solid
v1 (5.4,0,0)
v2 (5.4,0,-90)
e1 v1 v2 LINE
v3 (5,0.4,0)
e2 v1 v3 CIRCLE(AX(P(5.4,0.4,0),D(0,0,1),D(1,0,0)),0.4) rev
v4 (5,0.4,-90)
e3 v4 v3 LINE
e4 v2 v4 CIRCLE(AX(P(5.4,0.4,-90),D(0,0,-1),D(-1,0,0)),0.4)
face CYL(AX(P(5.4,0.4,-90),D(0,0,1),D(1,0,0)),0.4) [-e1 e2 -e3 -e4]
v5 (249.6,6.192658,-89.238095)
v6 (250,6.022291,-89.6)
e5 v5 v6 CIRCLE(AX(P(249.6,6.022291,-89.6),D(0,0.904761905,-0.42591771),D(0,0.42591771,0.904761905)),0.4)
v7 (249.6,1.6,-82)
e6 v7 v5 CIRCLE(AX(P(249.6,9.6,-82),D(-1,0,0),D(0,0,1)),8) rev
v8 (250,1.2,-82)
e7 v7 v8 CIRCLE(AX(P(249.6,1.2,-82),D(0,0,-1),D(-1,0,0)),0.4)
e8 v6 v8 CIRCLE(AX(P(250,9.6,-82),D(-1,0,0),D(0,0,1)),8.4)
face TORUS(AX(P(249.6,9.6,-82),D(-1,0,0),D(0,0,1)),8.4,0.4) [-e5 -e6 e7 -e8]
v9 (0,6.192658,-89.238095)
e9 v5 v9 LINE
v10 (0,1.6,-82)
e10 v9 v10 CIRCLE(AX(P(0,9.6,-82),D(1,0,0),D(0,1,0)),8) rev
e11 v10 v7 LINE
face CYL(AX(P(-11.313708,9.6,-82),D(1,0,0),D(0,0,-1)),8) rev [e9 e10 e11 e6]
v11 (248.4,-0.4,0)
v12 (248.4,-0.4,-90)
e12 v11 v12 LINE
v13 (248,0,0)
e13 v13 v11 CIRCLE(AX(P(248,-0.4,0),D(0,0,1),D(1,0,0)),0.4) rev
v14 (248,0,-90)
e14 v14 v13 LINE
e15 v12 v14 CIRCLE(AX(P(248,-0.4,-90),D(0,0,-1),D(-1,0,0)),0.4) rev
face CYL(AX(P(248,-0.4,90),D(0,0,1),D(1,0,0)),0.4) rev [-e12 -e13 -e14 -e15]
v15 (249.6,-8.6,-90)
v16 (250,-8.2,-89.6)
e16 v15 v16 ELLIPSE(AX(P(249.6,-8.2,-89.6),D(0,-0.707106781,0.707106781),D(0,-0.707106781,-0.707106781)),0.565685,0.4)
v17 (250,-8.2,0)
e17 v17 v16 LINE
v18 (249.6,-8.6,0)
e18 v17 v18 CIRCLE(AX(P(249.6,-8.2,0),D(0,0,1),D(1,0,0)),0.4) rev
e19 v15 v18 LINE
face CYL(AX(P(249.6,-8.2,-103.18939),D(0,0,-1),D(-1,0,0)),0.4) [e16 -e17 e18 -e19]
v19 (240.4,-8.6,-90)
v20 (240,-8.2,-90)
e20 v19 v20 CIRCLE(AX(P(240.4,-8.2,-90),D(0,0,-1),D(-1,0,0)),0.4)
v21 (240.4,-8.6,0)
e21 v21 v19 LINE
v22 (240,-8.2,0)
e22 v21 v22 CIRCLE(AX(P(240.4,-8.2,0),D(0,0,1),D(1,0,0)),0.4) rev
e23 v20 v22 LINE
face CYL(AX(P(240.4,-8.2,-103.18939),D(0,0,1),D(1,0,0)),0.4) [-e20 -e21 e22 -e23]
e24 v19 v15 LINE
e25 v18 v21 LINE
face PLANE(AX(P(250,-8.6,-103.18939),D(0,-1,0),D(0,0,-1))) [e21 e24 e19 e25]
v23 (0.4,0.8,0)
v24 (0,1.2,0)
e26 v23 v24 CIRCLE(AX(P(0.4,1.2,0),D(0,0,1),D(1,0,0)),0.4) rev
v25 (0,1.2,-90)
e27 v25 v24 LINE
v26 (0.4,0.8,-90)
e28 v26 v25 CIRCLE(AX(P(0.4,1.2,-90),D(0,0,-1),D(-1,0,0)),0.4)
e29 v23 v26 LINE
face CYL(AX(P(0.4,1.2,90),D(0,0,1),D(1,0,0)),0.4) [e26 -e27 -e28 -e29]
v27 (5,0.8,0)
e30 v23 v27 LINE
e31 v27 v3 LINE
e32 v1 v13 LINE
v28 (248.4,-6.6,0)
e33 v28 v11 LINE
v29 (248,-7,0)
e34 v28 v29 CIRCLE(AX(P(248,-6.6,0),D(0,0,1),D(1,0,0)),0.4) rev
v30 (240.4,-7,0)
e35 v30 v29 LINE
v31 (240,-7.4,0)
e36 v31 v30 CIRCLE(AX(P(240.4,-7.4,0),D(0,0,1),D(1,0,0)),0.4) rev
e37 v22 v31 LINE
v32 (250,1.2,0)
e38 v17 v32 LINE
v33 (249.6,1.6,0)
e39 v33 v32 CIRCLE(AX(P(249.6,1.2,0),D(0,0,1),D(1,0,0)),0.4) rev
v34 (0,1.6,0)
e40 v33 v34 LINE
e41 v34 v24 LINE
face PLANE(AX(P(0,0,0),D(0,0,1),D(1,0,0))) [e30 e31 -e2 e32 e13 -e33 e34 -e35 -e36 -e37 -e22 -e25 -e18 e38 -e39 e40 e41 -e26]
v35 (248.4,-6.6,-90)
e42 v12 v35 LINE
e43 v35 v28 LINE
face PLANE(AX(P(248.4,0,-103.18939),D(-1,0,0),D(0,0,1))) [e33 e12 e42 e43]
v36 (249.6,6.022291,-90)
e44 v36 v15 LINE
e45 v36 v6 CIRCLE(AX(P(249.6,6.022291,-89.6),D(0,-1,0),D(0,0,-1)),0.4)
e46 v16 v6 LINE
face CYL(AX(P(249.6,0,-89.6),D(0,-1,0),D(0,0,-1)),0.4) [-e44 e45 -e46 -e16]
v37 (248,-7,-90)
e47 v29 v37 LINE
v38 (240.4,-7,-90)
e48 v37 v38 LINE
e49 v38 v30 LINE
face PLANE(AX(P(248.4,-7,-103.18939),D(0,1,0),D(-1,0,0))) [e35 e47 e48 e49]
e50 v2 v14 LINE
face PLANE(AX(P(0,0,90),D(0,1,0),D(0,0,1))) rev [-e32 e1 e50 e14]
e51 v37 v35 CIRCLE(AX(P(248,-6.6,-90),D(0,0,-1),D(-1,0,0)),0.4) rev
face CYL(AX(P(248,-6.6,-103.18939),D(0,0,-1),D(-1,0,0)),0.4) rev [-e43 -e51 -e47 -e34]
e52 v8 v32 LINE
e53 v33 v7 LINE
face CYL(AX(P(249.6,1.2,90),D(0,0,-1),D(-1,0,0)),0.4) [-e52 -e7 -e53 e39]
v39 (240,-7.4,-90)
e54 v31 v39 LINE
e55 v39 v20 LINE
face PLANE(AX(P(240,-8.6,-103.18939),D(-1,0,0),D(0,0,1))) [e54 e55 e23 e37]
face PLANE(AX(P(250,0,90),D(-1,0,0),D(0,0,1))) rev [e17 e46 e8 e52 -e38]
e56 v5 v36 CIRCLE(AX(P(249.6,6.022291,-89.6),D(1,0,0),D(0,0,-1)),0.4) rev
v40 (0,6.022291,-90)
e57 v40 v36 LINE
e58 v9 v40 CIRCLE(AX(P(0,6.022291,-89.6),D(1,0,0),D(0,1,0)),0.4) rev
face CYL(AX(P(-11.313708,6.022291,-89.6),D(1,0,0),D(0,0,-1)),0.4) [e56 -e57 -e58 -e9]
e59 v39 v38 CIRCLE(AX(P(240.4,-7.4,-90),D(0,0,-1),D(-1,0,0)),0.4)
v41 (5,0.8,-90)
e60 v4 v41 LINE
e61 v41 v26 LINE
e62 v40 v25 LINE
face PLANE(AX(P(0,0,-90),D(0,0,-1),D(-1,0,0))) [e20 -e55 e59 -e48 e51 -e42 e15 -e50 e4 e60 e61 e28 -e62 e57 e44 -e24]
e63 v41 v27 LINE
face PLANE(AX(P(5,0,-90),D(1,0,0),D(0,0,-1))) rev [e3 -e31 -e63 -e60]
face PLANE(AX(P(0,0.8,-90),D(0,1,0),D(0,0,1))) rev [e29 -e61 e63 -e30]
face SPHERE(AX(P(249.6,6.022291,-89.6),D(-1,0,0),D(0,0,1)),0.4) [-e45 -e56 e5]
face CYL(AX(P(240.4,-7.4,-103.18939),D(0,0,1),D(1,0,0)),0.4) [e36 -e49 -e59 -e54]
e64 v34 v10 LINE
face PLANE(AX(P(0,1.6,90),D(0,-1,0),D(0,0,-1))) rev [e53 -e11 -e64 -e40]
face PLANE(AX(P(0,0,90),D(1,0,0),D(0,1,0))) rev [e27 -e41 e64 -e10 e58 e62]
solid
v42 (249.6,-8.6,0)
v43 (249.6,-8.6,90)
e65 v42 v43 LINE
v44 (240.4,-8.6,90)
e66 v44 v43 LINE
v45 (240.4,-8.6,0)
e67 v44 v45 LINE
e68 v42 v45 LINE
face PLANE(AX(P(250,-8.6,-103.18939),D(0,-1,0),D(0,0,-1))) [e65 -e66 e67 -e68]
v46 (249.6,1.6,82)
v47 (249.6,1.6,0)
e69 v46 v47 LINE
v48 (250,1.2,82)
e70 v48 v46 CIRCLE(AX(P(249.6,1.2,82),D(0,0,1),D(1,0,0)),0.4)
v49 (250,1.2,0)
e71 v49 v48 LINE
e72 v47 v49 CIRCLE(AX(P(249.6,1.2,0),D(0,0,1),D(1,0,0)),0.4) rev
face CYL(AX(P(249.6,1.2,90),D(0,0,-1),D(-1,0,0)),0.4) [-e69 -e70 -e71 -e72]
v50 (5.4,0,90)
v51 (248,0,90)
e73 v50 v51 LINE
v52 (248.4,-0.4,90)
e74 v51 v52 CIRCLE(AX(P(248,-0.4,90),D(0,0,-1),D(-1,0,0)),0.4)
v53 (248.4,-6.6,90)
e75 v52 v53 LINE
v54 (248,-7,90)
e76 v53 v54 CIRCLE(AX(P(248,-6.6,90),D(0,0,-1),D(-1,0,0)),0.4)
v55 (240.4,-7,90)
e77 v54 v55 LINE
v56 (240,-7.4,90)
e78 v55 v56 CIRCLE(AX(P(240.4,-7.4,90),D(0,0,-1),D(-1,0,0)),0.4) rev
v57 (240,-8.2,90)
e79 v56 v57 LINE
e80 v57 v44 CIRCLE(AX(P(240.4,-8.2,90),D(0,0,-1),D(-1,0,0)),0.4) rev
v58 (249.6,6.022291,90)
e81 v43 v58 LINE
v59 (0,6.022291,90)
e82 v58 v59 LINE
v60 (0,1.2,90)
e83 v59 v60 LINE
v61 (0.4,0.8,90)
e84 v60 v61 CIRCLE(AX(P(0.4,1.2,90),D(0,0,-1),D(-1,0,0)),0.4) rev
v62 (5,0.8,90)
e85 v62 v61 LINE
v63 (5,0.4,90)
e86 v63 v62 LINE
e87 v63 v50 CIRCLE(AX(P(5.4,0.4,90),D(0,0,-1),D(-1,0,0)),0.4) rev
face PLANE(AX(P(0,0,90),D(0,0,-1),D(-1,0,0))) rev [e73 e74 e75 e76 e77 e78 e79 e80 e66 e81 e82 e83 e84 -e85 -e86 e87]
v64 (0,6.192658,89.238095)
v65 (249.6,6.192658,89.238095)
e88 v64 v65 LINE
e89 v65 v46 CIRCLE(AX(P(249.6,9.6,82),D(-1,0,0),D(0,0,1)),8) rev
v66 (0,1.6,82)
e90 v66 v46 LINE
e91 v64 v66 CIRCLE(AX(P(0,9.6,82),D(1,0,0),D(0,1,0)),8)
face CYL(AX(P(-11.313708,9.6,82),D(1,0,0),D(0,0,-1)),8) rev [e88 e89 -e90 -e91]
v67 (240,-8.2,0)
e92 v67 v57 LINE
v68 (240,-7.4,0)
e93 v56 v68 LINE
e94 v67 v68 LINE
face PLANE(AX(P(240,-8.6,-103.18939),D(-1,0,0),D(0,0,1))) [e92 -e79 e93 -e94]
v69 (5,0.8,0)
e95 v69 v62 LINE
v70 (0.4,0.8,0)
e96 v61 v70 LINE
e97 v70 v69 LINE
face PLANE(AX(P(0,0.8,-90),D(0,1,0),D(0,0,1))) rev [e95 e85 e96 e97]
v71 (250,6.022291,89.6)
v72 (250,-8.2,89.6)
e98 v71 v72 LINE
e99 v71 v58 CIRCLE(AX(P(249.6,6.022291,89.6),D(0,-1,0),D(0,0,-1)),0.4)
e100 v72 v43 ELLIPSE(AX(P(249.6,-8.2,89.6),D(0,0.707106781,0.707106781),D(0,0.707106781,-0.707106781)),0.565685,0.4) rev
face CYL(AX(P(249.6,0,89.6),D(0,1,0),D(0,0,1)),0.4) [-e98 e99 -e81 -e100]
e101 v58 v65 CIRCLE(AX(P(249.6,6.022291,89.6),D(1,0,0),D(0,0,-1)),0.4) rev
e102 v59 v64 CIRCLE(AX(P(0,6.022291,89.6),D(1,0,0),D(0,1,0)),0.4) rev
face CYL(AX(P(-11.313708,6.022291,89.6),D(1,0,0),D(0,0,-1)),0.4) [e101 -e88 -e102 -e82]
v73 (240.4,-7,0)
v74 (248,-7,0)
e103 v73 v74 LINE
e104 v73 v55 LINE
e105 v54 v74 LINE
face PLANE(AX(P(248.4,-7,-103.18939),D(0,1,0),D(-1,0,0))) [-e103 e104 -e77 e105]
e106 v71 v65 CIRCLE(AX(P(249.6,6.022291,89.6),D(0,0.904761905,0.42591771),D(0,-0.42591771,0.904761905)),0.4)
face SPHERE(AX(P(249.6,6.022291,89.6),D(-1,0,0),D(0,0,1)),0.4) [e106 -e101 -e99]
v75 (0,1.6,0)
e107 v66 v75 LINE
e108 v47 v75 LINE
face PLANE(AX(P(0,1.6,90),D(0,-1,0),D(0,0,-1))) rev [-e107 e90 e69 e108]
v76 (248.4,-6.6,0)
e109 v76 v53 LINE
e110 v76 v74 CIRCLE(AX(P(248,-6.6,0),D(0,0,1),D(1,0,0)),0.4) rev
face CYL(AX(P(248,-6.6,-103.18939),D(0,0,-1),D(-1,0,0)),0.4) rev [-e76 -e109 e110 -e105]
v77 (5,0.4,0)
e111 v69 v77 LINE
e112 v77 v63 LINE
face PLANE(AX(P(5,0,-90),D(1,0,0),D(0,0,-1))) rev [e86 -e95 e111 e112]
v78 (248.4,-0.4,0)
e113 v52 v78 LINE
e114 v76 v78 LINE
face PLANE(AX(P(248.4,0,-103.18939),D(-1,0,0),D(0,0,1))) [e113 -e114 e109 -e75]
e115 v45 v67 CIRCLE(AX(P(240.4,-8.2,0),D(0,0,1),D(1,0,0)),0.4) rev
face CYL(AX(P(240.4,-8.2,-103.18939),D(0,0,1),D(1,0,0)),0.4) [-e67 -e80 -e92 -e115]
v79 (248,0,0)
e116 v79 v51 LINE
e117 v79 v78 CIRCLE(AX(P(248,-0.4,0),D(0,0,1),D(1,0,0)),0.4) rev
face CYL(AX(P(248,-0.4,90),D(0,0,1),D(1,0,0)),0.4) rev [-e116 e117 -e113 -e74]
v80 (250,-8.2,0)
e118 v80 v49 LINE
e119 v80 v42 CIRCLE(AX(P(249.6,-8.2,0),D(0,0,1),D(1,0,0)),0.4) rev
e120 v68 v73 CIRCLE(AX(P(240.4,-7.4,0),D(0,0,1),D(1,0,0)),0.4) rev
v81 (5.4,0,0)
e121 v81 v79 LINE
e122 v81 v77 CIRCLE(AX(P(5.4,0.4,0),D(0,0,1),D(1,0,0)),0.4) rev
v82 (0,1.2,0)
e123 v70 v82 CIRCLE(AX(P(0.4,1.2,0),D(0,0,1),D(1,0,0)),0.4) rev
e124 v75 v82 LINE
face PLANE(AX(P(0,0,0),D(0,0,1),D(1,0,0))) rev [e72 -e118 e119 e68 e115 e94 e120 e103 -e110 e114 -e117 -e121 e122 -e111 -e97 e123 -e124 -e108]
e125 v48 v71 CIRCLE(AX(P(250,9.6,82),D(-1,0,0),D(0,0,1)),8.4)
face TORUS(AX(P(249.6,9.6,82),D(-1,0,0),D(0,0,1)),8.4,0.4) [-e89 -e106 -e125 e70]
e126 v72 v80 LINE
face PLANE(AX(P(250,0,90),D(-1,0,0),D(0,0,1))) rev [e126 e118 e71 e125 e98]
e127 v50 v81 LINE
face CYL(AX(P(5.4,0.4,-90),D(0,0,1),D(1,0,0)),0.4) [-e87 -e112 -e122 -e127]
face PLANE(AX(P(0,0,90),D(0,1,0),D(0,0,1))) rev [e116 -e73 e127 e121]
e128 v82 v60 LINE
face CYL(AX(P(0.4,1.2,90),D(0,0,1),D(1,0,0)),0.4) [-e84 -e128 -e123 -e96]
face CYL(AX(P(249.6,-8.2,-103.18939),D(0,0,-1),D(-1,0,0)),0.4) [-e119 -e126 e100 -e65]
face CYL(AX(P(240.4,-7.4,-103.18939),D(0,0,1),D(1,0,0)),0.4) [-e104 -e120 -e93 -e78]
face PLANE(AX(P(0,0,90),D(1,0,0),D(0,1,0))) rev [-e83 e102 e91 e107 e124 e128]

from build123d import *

# Parameters (mm, degrees)
SKETCH1_W           = 250
SKETCH1_H           = 1.6
BOSS_EXTRUDE1_DEPTH = 90
BOSS_EXTRUDE2_DEPTH = 180
SKETCH3_W           = 5
SKETCH3_H           = 0.8
CUT_EXTRUDE1_DEPTH  = 309.178454795
BOSS_EXTRUDE3_DEPTH = 250
FILLET2_R           = 0.4
MIRROR1_DEPTH       = 250
FILLET1_R           = 0.4


# Read off the part's stored shape, not the designer's step: Mirror1
with BuildPart() as part:
    # Sketch1 → Boss-Extrude1 (new, symmetric)
    with BuildSketch(Plane.XY):
        with Locations((125, 0.8)):
            Rectangle(SKETCH1_W, SKETCH1_H)
    extrude(amount=BOSS_EXTRUDE1_DEPTH, both=True)

    # Sketch2 → Boss-Extrude2 (add)
    with BuildSketch(Plane.XY.offset(90)):
        Polygon((250, 0), (248.4, 0), (248.4, -7), (240, -7), (240, -8.6), (250, -8.6), align=None)
    extrude(amount=-BOSS_EXTRUDE2_DEPTH)

    # Sketch3 → Cut-Extrude1 (cut, through all)
    with BuildSketch(Plane.XY.offset(90)):
        with Locations((2.5, 0.4)):
            Rectangle(SKETCH3_W, SKETCH3_H)
    extrude(amount=-CUT_EXTRUDE1_DEPTH, mode=Mode.SUBTRACT)

    # Sketch6 → Boss-Extrude3 (add)
    with BuildSketch(Plane(origin=(250, 0, 0), x_dir=(0, 0, -1), z_dir=(1, 0, 0))):
        with BuildLine():
            Line((-90, 1.6), (-82, 1.6))
            ThreePointArc((-82, 1.6), (-87.656854249, 3.943145751), (-90, 9.6))
            Line((-90, 9.6), (-90, 1.6))
        make_face()
    extrude(amount=-BOSS_EXTRUDE3_DEPTH)

    # Fillet2
    fillet2_edges = [part.edges().sort_by_distance(p)[0] for p in [
        (125, 9.6, 90),
    ]]
    fillet(fillet2_edges, radius=FILLET2_R)

    # Mirror1 outline → Mirror1 (add)
    with BuildSketch(Plane.YZ):
        with BuildLine():
            Line((1.6, -82), (1.6, -90))
            Line((1.6, -90), (6.022291236, -90))
            ThreePointArc((6.022291236, -90), (6.412651265, -89.687287156), (6.19265832, -89.238095238))
            ThreePointArc((6.19265832, -89.238095238), (2.845048726, -86.286097675), (1.6, -82))
        make_face()
    extrude(amount=MIRROR1_DEPTH)

    # Fillet1
    fillet1_edges = [part.edges().sort_by_distance(p)[0] for p in [
        (250, -1.288854382, 90),
        (248.4, 0, 0),
        (248.4, -7, 0),
        (240, -7, 0),
        (240, -8.6, 0),
        (250, -8.6, 0),
        (0, 0.8, 0),
        (5, 0, 0),
        (250, 1.6, 0),
        (250, 2.845048726, 86.286097675),
        (250, -1.288854382, -90),
        (250, 6.412651265, 89.687287156),
        (250, 2.845048726, -86.286097675),
        (250, 6.412651265, -89.687287156),
    ]]
    fillet(fillet1_edges, radius=FILLET1_R - 0.0001)  # a hair under: the kernel refuses the full size


with BuildPart() as body_2:
    # Split1: the piece on the far side of the plane
    add(part.part)
    split(bisect_by=Plane.XY, keep=Keep.BOTTOM)


with BuildPart() as part_1:
    add(part.part)

    # Split1
    split(bisect_by=Plane.XY, keep=Keep.TOP)


solid = Compound([body_2.part, part_1.part])
